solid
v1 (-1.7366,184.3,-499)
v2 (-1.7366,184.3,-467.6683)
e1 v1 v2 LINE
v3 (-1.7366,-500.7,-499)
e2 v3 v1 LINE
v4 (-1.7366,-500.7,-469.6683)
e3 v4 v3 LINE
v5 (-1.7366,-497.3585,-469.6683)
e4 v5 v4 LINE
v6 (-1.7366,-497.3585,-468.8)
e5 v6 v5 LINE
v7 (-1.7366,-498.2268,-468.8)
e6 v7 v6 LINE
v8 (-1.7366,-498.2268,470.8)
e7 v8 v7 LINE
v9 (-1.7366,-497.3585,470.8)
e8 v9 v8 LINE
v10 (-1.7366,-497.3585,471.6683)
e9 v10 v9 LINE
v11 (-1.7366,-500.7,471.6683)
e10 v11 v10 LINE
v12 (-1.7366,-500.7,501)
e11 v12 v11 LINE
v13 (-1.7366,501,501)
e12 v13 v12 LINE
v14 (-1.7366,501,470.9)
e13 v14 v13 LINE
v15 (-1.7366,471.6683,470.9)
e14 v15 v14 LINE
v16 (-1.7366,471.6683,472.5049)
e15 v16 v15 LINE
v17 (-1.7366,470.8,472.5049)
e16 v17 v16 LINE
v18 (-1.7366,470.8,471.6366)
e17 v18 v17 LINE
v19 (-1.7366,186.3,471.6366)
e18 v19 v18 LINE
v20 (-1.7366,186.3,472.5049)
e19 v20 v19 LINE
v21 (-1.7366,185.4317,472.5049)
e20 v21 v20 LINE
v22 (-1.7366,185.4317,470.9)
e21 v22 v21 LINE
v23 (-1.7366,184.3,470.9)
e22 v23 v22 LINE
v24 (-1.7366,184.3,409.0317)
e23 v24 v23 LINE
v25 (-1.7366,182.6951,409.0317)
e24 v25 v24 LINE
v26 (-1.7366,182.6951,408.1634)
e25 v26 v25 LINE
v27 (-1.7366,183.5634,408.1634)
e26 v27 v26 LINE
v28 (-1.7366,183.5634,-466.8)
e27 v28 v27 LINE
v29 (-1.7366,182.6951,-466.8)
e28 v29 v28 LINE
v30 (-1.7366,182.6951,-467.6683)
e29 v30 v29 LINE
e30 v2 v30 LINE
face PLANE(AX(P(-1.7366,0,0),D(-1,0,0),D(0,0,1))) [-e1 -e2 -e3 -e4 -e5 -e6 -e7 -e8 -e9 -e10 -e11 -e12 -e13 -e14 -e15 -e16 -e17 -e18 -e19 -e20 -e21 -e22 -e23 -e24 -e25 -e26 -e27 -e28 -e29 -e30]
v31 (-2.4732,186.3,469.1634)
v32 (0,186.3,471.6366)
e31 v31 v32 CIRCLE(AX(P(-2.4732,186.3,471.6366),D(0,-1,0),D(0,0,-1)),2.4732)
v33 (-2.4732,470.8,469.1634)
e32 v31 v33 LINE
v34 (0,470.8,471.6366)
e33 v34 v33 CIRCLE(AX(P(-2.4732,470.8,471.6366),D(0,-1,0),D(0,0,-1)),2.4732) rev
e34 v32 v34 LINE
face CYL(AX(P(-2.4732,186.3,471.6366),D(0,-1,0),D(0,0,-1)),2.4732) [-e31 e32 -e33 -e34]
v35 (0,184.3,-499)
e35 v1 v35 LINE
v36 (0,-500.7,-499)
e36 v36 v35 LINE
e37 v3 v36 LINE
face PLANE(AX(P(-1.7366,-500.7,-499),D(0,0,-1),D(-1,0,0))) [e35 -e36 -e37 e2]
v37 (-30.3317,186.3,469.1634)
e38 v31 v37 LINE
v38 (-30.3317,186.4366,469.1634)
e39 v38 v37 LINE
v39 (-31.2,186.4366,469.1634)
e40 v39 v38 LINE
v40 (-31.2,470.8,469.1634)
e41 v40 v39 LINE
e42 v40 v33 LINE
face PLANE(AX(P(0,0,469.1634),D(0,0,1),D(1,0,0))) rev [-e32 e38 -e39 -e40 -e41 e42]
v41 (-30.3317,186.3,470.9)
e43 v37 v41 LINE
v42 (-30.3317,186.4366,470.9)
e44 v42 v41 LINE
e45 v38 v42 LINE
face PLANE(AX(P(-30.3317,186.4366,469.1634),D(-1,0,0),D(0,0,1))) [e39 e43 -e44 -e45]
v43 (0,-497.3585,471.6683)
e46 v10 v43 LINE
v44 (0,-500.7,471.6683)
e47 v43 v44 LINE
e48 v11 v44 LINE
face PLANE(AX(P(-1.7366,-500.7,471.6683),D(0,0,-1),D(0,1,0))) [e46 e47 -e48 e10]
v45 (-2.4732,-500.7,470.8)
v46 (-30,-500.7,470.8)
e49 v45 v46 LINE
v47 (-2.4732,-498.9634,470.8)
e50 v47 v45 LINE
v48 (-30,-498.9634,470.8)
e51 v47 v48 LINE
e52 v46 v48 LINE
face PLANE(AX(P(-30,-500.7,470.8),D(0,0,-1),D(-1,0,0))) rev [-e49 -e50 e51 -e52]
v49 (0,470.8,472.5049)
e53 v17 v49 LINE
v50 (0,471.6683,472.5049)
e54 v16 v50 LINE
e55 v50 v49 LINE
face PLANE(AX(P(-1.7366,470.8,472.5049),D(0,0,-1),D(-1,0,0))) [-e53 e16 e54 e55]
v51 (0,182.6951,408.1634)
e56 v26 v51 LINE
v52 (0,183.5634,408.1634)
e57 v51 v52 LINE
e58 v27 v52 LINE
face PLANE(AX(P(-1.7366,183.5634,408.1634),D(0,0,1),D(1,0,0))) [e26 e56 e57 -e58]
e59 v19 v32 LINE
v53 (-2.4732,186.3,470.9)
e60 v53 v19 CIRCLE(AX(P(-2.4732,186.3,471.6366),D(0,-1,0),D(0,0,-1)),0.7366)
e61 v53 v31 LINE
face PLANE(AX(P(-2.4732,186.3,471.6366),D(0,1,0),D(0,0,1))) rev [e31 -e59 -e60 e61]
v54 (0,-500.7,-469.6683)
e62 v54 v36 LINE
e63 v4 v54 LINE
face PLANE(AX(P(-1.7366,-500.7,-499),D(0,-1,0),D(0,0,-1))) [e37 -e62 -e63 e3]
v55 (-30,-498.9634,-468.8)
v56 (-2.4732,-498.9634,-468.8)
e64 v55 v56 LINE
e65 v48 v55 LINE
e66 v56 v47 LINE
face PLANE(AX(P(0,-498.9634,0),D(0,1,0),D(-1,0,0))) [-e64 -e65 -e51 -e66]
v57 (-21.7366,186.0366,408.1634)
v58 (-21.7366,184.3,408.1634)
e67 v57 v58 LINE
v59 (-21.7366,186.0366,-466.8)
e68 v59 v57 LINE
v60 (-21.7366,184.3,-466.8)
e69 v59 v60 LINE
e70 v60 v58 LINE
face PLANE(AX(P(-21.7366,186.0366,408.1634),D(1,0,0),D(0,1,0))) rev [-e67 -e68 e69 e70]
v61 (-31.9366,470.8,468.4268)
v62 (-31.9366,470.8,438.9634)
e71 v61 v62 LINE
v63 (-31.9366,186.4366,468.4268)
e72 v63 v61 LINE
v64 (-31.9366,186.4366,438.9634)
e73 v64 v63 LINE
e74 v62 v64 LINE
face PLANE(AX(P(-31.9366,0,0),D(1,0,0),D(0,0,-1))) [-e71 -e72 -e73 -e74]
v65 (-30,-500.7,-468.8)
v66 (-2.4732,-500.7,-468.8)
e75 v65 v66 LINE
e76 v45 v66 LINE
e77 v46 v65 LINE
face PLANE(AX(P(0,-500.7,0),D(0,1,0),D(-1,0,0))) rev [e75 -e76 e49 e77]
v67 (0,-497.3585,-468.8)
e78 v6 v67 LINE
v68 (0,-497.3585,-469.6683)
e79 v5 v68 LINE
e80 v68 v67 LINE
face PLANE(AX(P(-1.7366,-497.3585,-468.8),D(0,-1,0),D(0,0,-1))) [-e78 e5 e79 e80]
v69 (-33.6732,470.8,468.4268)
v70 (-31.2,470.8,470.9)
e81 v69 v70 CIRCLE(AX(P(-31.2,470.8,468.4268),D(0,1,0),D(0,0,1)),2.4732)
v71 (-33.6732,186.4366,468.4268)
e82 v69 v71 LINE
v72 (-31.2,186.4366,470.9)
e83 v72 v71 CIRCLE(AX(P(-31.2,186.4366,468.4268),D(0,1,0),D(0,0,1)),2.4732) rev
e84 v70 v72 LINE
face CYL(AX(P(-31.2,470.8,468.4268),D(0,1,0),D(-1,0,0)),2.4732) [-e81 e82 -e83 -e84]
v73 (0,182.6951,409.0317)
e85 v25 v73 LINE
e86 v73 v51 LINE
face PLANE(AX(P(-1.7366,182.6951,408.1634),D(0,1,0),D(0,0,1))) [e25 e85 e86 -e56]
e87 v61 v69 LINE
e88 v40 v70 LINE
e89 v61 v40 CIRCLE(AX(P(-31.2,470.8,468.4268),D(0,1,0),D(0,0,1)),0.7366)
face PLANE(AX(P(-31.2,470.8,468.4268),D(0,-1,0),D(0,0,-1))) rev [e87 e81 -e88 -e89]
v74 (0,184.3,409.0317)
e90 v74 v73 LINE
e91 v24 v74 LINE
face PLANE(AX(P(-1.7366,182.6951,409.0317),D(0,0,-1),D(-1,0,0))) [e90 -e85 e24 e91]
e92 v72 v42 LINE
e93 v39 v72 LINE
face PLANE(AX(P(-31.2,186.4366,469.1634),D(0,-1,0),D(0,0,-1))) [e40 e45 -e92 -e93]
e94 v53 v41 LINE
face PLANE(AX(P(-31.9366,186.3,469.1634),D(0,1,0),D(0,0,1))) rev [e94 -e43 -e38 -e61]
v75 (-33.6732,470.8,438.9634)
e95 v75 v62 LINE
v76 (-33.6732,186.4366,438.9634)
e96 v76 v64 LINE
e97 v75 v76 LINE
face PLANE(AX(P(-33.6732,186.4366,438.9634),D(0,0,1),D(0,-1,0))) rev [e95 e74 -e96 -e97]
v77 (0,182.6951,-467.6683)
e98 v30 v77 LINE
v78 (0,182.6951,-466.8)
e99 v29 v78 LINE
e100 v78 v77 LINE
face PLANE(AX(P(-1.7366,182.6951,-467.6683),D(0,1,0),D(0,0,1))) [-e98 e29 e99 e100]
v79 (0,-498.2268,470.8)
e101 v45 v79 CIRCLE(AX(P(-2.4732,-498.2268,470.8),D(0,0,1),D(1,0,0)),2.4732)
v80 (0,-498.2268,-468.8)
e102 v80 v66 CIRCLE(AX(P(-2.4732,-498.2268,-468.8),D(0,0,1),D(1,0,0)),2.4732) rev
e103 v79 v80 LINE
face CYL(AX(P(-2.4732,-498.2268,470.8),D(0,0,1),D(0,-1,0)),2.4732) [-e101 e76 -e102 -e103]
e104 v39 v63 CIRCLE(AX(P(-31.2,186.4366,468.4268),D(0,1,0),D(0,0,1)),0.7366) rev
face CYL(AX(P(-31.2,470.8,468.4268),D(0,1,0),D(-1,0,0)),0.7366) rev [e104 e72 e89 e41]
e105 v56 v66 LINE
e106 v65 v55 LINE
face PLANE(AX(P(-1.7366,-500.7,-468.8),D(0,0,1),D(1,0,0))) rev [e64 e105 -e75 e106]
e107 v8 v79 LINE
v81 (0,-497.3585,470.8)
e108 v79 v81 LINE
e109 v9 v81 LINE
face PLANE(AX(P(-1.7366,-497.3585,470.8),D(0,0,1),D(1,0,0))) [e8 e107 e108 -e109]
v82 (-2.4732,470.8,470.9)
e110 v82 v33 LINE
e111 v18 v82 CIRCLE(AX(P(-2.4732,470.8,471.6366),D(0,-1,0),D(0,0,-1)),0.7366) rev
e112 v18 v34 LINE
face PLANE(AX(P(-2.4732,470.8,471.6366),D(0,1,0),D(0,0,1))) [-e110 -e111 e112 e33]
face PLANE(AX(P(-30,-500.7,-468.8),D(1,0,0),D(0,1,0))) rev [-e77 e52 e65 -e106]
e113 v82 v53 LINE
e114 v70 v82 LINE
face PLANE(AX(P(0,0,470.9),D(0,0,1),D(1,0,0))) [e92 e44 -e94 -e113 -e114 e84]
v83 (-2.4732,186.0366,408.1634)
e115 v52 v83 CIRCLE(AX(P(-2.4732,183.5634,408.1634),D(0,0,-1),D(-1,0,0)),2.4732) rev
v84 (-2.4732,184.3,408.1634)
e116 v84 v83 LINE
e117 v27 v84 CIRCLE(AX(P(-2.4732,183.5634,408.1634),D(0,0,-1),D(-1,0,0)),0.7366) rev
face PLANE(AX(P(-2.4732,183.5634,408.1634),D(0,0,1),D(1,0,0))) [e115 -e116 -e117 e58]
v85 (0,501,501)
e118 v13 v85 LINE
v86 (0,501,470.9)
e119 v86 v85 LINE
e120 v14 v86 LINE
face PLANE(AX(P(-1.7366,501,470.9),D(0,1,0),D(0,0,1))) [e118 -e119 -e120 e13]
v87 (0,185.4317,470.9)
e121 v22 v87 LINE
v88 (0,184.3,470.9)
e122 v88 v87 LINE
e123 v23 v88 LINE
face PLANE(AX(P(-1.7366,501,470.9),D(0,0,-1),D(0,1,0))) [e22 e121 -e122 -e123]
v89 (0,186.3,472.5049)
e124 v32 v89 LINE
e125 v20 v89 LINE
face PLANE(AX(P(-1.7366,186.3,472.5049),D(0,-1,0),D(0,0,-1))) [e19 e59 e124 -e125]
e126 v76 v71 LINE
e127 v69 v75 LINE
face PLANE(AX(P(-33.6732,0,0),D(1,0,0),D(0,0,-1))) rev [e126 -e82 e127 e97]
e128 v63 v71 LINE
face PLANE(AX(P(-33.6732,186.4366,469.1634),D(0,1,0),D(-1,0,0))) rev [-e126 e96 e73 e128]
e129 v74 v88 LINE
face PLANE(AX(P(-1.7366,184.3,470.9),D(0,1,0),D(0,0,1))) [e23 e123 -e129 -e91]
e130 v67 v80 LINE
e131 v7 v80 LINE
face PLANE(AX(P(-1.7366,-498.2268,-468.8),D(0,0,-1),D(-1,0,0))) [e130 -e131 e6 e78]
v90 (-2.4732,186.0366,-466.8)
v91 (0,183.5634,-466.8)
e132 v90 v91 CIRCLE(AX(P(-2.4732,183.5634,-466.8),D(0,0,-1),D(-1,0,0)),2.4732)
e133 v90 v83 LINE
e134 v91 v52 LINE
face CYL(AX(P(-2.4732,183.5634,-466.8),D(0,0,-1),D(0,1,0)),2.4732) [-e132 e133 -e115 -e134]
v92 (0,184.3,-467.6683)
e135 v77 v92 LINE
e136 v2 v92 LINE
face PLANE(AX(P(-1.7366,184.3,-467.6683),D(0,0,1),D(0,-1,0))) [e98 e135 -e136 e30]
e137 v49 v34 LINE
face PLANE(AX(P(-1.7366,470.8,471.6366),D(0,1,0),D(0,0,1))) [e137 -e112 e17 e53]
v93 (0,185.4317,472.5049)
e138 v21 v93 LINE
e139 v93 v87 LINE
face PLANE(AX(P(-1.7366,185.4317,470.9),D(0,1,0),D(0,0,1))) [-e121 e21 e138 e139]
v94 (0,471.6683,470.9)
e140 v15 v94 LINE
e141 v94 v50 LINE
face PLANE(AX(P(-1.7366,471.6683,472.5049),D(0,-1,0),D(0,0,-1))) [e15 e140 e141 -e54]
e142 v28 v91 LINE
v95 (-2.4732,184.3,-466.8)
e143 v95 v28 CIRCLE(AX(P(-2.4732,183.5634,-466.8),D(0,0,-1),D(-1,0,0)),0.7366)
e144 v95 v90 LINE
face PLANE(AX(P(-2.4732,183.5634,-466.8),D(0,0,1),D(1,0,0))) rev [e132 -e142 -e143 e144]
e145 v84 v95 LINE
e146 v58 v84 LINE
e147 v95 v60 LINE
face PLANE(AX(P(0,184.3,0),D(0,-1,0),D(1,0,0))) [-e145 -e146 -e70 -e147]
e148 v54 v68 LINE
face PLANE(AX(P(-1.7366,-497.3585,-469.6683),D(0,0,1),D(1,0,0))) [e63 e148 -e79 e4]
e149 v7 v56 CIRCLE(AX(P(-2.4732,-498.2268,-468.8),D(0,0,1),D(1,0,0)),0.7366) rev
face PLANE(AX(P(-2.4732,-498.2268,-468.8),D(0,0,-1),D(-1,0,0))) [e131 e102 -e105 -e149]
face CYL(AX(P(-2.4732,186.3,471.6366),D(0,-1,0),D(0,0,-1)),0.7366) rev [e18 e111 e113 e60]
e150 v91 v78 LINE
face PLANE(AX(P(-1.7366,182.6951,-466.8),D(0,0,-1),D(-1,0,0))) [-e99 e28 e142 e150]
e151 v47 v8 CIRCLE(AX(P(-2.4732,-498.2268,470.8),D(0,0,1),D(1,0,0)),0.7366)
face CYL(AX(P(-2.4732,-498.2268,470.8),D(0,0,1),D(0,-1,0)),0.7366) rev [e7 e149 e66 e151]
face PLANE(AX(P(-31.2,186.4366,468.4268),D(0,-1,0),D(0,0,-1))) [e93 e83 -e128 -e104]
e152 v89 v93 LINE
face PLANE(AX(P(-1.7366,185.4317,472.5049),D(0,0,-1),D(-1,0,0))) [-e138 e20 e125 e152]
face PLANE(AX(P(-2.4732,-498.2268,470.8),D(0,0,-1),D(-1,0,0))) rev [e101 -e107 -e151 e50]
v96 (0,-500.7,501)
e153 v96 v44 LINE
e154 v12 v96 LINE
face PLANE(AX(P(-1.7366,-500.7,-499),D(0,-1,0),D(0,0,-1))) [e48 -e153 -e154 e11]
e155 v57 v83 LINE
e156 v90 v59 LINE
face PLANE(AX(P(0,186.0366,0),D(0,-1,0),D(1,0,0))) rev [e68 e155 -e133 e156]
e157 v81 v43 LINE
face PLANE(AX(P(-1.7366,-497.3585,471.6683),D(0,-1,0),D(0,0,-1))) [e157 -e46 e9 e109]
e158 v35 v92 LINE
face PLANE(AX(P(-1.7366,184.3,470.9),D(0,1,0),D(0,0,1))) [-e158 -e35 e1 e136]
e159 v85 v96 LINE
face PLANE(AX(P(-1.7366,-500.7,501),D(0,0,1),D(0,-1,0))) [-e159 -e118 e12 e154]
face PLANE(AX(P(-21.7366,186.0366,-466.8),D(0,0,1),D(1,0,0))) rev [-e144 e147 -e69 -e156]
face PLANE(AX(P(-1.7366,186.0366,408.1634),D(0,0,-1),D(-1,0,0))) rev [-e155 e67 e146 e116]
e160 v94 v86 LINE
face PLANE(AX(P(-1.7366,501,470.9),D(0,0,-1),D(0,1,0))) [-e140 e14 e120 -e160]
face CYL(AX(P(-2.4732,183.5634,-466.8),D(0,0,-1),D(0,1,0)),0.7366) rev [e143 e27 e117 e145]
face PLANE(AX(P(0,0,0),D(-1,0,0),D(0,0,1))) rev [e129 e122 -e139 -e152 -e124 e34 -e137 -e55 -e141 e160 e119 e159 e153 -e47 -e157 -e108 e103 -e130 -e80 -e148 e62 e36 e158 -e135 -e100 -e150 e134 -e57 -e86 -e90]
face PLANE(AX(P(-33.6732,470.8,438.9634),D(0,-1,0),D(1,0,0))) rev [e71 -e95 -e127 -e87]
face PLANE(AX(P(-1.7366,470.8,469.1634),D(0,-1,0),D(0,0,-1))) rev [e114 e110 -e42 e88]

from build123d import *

# Parameters (mm, degrees)
BASE_FLANGE2_DEPTH            = 1.7366
EDGE_FLANGE5_STRIP_W          = 8.4196
EDGE_FLANGE5_STRIP_H          = 1.7366
EDGE_FLANGE5_STRIP_CUT_DEPTH  = 939.6
EDGE_FLANGE5_RELIEF_W         = 9.2879
EDGE_FLANGE5_RELIEF_H         = 0.8683
EDGE_FLANGE5_RELIEF_CUT_DEPTH = 1.7366
EDGE_FLANGE5_DEPTH            = 939.6
EDGE_FLANGE6_STRIP_W          = 8.4196
EDGE_FLANGE6_STRIP_H          = 1.7366
EDGE_FLANGE6_STRIP_CUT_DEPTH  = 284.5
EDGE_FLANGE6_RELIEF_W         = 9.2879
EDGE_FLANGE6_RELIEF_H         = 0.8683
EDGE_FLANGE6_RELIEF_CUT_DEPTH = 1.7366
EDGE_FLANGE6_DEPTH            = 284.5
EDGE_FLANGE8_STRIP_W          = 8.4196
EDGE_FLANGE8_STRIP_H          = 1.7366
EDGE_FLANGE8_STRIP_CUT_DEPTH  = 874.9634
EDGE_FLANGE8_RELIEF_W         = 9.2879
EDGE_FLANGE8_RELIEF_H         = 0.8683
EDGE_FLANGE8_RELIEF_CUT_DEPTH = 1.7366
EDGE_FLANGE8_DEPTH            = 874.9634
EDGE_FLANGE9_STRIP_W          = 8.4196
EDGE_FLANGE9_STRIP_H          = 1.7366
EDGE_FLANGE9_STRIP_CUT_DEPTH  = 284.3634
EDGE_FLANGE9_RELIEF_W         = 9.2879
EDGE_FLANGE9_RELIEF_H         = 0.8683
EDGE_FLANGE9_RELIEF_CUT_DEPTH = 1.7366
EDGE_FLANGE9_DEPTH            = 284.3634


# Sheet-metal steps are written as plain solids
with BuildPart() as part:
    # Sketch10 → Base-Flange2 (new body)
    with BuildSketch(Plane(origin=(0, 0, 0), x_dir=(0, 0, -1), z_dir=(1, 0, 0))):
        Polygon((-470.9, 501), (-470.9, 184.3), (499, 184.3), (499, -500.7), (-501, -500.7), (-501, 501), align=None)
    extrude(amount=-BASE_FLANGE2_DEPTH)

    # Edge-Flange5 strip (across the edge) → Edge-Flange5 strip cut (cut)
    with BuildSketch(Plane(origin=(-1.7366, -500.7, -468.8), x_dir=(0, 1, 0), z_dir=(0, 0, 1))):
        with Locations((-1.7366, -0.8683)):
            Rectangle(EDGE_FLANGE5_STRIP_W, EDGE_FLANGE5_STRIP_H)
    extrude(amount=EDGE_FLANGE5_STRIP_CUT_DEPTH, mode=Mode.SUBTRACT)

    # Edge-Flange5 relief (on the sheet) → Edge-Flange5 relief cut (cut)
    with BuildSketch(Plane(origin=(-1.7366, -498.2268, -468.8), x_dir=(0, 1, 0), z_dir=(-1, 0, 0))):
        with Locations((-3.77565, 0.43415)):
            Rectangle(EDGE_FLANGE5_RELIEF_W, EDGE_FLANGE5_RELIEF_H)
        with Locations((-3.77565, -940.03415)):
            Rectangle(EDGE_FLANGE5_RELIEF_W, EDGE_FLANGE5_RELIEF_H)
    extrude(amount=-EDGE_FLANGE5_RELIEF_CUT_DEPTH, mode=Mode.SUBTRACT)

    # Edge-Flange5 section (across the edge) → Edge-Flange5 (add)
    with BuildSketch(Plane(origin=(-1.7366, -500.7, -468.8), x_dir=(0, 1, 0), z_dir=(0, 0, 1))):
        with BuildLine():
            Line((0, 0.7366), (0, 28.2634))
            Line((0, 28.2634), (1.7366, 28.2634))
            Line((1.7366, 28.2634), (1.7366, 0.7366))
            ThreePointArc((1.7366, 0.7366), (1.952345145, 0.215745145), (2.4732, 0))
            Line((2.4732, 0), (2.4732, -1.7366))
            ThreePointArc((2.4732, -1.7366), (0.724383509, -1.012216491), (0, 0.7366))
        make_face()
    extrude(amount=EDGE_FLANGE5_DEPTH)

    # Edge-Flange6 strip (across the edge) → Edge-Flange6 strip cut (cut)
    with BuildSketch(Plane(origin=(-1.7366, 470.8, 470.9), x_dir=(0, 0, 1), z_dir=(0, -1, 0))):
        with Locations((-3.4732, -0.8683)):
            Rectangle(EDGE_FLANGE6_STRIP_W, EDGE_FLANGE6_STRIP_H)
    extrude(amount=EDGE_FLANGE6_STRIP_CUT_DEPTH, mode=Mode.SUBTRACT)

    # Edge-Flange6 relief (on the sheet) → Edge-Flange6 relief cut (cut)
    with BuildSketch(Plane(origin=(-1.7366, 470.8, 471.6366), x_dir=(0, 0, 1), z_dir=(-1, 0, 0))):
        with Locations((-3.77565, 0.43415)):
            Rectangle(EDGE_FLANGE6_RELIEF_W, EDGE_FLANGE6_RELIEF_H)
        with Locations((-3.77565, -284.93415)):
            Rectangle(EDGE_FLANGE6_RELIEF_W, EDGE_FLANGE6_RELIEF_H)
    extrude(amount=-EDGE_FLANGE6_RELIEF_CUT_DEPTH, mode=Mode.SUBTRACT)

    # Edge-Flange6 section (across the edge) → Edge-Flange6 (add)
    with BuildSketch(Plane(origin=(-1.7366, 470.8, 470.9), x_dir=(0, 0, 1), z_dir=(0, -1, 0))):
        with BuildLine():
            Line((-1.7366, 0.7366), (-1.7366, 30.2))
            Line((-1.7366, 30.2), (0, 30.2))
            Line((0, 30.2), (0, 0.7366))
            ThreePointArc((0, 0.7366), (0.215745145, 0.215745145), (0.7366, 0))
            Line((0.7366, 0), (0.7366, -1.7366))
            ThreePointArc((0.7366, -1.7366), (-1.012216491, -1.012216491), (-1.7366, 0.7366))
        make_face()
    extrude(amount=EDGE_FLANGE6_DEPTH)

    # Edge-Flange8 strip (across the edge) → Edge-Flange8 strip cut (cut)
    with BuildSketch(Plane(origin=(-1.7366, 184.3, 408.1634), x_dir=(0, -1, 0), z_dir=(0, 0, -1))):
        with Locations((-3.4732, -0.8683)):
            Rectangle(EDGE_FLANGE8_STRIP_W, EDGE_FLANGE8_STRIP_H)
    extrude(amount=EDGE_FLANGE8_STRIP_CUT_DEPTH, mode=Mode.SUBTRACT)

    # Edge-Flange8 relief (on the sheet) → Edge-Flange8 relief cut (cut)
    with BuildSketch(Plane(origin=(-1.7366, 183.5634, 408.1634), x_dir=(0, -1, 0), z_dir=(-1, 0, 0))):
        with Locations((-3.77565, 0.43415)):
            Rectangle(EDGE_FLANGE8_RELIEF_W, EDGE_FLANGE8_RELIEF_H)
        with Locations((-3.77565, -875.39755)):
            Rectangle(EDGE_FLANGE8_RELIEF_W, EDGE_FLANGE8_RELIEF_H)
    extrude(amount=-EDGE_FLANGE8_RELIEF_CUT_DEPTH, mode=Mode.SUBTRACT)

    # Edge-Flange8 section (across the edge) → Edge-Flange8 (add)
    with BuildSketch(Plane(origin=(-1.7366, 184.3, 408.1634), x_dir=(0, -1, 0), z_dir=(0, 0, -1))):
        with BuildLine():
            Line((-1.7366, 0.7366), (-1.7366, 20))
            Line((-1.7366, 20), (0, 20))
            Line((0, 20), (0, 0.7366))
            ThreePointArc((0, 0.7366), (0.215745145, 0.215745145), (0.7366, 0))
            Line((0.7366, 0), (0.7366, -1.7366))
            ThreePointArc((0.7366, -1.7366), (-1.012216491, -1.012216491), (-1.7366, 0.7366))
        make_face()
    extrude(amount=EDGE_FLANGE8_DEPTH)

    # Edge-Flange9 strip (across the edge) → Edge-Flange9 strip cut (cut)
    with BuildSketch(Plane(origin=(-31.9366, 186.4366, 469.1634), x_dir=(1, 0, 0), z_dir=(0, 1, 0))):
        with Locations((-3.4732, -0.8683)):
            Rectangle(EDGE_FLANGE9_STRIP_W, EDGE_FLANGE9_STRIP_H)
    extrude(amount=EDGE_FLANGE9_STRIP_CUT_DEPTH, mode=Mode.SUBTRACT)

    # Edge-Flange9 relief (on the sheet) → Edge-Flange9 relief cut (cut)
    with BuildSketch(Plane(origin=(-31.2, 186.4366, 469.1634), x_dir=(1, 0, 0), z_dir=(0, 0, -1))):
        with Locations((-3.77565, 0.43415)):
            Rectangle(EDGE_FLANGE9_RELIEF_W, EDGE_FLANGE9_RELIEF_H)
    extrude(amount=-EDGE_FLANGE9_RELIEF_CUT_DEPTH, mode=Mode.SUBTRACT)

    # Edge-Flange9 section (across the edge) → Edge-Flange9 (add)
    with BuildSketch(Plane(origin=(-31.9366, 186.4366, 469.1634), x_dir=(1, 0, 0), z_dir=(0, 1, 0))):
        with BuildLine():
            Line((-1.7366, 0.7366), (-1.7366, 30.2))
            Line((-1.7366, 30.2), (0, 30.2))
            Line((0, 30.2), (0, 0.7366))
            ThreePointArc((0, 0.7366), (0.215745145, 0.215745145), (0.7366, 0))
            Line((0.7366, 0), (0.7366, -1.7366))
            ThreePointArc((0.7366, -1.7366), (-1.012216491, -1.012216491), (-1.7366, 0.7366))
        make_face()
    extrude(amount=EDGE_FLANGE9_DEPTH)


solid = part.part
